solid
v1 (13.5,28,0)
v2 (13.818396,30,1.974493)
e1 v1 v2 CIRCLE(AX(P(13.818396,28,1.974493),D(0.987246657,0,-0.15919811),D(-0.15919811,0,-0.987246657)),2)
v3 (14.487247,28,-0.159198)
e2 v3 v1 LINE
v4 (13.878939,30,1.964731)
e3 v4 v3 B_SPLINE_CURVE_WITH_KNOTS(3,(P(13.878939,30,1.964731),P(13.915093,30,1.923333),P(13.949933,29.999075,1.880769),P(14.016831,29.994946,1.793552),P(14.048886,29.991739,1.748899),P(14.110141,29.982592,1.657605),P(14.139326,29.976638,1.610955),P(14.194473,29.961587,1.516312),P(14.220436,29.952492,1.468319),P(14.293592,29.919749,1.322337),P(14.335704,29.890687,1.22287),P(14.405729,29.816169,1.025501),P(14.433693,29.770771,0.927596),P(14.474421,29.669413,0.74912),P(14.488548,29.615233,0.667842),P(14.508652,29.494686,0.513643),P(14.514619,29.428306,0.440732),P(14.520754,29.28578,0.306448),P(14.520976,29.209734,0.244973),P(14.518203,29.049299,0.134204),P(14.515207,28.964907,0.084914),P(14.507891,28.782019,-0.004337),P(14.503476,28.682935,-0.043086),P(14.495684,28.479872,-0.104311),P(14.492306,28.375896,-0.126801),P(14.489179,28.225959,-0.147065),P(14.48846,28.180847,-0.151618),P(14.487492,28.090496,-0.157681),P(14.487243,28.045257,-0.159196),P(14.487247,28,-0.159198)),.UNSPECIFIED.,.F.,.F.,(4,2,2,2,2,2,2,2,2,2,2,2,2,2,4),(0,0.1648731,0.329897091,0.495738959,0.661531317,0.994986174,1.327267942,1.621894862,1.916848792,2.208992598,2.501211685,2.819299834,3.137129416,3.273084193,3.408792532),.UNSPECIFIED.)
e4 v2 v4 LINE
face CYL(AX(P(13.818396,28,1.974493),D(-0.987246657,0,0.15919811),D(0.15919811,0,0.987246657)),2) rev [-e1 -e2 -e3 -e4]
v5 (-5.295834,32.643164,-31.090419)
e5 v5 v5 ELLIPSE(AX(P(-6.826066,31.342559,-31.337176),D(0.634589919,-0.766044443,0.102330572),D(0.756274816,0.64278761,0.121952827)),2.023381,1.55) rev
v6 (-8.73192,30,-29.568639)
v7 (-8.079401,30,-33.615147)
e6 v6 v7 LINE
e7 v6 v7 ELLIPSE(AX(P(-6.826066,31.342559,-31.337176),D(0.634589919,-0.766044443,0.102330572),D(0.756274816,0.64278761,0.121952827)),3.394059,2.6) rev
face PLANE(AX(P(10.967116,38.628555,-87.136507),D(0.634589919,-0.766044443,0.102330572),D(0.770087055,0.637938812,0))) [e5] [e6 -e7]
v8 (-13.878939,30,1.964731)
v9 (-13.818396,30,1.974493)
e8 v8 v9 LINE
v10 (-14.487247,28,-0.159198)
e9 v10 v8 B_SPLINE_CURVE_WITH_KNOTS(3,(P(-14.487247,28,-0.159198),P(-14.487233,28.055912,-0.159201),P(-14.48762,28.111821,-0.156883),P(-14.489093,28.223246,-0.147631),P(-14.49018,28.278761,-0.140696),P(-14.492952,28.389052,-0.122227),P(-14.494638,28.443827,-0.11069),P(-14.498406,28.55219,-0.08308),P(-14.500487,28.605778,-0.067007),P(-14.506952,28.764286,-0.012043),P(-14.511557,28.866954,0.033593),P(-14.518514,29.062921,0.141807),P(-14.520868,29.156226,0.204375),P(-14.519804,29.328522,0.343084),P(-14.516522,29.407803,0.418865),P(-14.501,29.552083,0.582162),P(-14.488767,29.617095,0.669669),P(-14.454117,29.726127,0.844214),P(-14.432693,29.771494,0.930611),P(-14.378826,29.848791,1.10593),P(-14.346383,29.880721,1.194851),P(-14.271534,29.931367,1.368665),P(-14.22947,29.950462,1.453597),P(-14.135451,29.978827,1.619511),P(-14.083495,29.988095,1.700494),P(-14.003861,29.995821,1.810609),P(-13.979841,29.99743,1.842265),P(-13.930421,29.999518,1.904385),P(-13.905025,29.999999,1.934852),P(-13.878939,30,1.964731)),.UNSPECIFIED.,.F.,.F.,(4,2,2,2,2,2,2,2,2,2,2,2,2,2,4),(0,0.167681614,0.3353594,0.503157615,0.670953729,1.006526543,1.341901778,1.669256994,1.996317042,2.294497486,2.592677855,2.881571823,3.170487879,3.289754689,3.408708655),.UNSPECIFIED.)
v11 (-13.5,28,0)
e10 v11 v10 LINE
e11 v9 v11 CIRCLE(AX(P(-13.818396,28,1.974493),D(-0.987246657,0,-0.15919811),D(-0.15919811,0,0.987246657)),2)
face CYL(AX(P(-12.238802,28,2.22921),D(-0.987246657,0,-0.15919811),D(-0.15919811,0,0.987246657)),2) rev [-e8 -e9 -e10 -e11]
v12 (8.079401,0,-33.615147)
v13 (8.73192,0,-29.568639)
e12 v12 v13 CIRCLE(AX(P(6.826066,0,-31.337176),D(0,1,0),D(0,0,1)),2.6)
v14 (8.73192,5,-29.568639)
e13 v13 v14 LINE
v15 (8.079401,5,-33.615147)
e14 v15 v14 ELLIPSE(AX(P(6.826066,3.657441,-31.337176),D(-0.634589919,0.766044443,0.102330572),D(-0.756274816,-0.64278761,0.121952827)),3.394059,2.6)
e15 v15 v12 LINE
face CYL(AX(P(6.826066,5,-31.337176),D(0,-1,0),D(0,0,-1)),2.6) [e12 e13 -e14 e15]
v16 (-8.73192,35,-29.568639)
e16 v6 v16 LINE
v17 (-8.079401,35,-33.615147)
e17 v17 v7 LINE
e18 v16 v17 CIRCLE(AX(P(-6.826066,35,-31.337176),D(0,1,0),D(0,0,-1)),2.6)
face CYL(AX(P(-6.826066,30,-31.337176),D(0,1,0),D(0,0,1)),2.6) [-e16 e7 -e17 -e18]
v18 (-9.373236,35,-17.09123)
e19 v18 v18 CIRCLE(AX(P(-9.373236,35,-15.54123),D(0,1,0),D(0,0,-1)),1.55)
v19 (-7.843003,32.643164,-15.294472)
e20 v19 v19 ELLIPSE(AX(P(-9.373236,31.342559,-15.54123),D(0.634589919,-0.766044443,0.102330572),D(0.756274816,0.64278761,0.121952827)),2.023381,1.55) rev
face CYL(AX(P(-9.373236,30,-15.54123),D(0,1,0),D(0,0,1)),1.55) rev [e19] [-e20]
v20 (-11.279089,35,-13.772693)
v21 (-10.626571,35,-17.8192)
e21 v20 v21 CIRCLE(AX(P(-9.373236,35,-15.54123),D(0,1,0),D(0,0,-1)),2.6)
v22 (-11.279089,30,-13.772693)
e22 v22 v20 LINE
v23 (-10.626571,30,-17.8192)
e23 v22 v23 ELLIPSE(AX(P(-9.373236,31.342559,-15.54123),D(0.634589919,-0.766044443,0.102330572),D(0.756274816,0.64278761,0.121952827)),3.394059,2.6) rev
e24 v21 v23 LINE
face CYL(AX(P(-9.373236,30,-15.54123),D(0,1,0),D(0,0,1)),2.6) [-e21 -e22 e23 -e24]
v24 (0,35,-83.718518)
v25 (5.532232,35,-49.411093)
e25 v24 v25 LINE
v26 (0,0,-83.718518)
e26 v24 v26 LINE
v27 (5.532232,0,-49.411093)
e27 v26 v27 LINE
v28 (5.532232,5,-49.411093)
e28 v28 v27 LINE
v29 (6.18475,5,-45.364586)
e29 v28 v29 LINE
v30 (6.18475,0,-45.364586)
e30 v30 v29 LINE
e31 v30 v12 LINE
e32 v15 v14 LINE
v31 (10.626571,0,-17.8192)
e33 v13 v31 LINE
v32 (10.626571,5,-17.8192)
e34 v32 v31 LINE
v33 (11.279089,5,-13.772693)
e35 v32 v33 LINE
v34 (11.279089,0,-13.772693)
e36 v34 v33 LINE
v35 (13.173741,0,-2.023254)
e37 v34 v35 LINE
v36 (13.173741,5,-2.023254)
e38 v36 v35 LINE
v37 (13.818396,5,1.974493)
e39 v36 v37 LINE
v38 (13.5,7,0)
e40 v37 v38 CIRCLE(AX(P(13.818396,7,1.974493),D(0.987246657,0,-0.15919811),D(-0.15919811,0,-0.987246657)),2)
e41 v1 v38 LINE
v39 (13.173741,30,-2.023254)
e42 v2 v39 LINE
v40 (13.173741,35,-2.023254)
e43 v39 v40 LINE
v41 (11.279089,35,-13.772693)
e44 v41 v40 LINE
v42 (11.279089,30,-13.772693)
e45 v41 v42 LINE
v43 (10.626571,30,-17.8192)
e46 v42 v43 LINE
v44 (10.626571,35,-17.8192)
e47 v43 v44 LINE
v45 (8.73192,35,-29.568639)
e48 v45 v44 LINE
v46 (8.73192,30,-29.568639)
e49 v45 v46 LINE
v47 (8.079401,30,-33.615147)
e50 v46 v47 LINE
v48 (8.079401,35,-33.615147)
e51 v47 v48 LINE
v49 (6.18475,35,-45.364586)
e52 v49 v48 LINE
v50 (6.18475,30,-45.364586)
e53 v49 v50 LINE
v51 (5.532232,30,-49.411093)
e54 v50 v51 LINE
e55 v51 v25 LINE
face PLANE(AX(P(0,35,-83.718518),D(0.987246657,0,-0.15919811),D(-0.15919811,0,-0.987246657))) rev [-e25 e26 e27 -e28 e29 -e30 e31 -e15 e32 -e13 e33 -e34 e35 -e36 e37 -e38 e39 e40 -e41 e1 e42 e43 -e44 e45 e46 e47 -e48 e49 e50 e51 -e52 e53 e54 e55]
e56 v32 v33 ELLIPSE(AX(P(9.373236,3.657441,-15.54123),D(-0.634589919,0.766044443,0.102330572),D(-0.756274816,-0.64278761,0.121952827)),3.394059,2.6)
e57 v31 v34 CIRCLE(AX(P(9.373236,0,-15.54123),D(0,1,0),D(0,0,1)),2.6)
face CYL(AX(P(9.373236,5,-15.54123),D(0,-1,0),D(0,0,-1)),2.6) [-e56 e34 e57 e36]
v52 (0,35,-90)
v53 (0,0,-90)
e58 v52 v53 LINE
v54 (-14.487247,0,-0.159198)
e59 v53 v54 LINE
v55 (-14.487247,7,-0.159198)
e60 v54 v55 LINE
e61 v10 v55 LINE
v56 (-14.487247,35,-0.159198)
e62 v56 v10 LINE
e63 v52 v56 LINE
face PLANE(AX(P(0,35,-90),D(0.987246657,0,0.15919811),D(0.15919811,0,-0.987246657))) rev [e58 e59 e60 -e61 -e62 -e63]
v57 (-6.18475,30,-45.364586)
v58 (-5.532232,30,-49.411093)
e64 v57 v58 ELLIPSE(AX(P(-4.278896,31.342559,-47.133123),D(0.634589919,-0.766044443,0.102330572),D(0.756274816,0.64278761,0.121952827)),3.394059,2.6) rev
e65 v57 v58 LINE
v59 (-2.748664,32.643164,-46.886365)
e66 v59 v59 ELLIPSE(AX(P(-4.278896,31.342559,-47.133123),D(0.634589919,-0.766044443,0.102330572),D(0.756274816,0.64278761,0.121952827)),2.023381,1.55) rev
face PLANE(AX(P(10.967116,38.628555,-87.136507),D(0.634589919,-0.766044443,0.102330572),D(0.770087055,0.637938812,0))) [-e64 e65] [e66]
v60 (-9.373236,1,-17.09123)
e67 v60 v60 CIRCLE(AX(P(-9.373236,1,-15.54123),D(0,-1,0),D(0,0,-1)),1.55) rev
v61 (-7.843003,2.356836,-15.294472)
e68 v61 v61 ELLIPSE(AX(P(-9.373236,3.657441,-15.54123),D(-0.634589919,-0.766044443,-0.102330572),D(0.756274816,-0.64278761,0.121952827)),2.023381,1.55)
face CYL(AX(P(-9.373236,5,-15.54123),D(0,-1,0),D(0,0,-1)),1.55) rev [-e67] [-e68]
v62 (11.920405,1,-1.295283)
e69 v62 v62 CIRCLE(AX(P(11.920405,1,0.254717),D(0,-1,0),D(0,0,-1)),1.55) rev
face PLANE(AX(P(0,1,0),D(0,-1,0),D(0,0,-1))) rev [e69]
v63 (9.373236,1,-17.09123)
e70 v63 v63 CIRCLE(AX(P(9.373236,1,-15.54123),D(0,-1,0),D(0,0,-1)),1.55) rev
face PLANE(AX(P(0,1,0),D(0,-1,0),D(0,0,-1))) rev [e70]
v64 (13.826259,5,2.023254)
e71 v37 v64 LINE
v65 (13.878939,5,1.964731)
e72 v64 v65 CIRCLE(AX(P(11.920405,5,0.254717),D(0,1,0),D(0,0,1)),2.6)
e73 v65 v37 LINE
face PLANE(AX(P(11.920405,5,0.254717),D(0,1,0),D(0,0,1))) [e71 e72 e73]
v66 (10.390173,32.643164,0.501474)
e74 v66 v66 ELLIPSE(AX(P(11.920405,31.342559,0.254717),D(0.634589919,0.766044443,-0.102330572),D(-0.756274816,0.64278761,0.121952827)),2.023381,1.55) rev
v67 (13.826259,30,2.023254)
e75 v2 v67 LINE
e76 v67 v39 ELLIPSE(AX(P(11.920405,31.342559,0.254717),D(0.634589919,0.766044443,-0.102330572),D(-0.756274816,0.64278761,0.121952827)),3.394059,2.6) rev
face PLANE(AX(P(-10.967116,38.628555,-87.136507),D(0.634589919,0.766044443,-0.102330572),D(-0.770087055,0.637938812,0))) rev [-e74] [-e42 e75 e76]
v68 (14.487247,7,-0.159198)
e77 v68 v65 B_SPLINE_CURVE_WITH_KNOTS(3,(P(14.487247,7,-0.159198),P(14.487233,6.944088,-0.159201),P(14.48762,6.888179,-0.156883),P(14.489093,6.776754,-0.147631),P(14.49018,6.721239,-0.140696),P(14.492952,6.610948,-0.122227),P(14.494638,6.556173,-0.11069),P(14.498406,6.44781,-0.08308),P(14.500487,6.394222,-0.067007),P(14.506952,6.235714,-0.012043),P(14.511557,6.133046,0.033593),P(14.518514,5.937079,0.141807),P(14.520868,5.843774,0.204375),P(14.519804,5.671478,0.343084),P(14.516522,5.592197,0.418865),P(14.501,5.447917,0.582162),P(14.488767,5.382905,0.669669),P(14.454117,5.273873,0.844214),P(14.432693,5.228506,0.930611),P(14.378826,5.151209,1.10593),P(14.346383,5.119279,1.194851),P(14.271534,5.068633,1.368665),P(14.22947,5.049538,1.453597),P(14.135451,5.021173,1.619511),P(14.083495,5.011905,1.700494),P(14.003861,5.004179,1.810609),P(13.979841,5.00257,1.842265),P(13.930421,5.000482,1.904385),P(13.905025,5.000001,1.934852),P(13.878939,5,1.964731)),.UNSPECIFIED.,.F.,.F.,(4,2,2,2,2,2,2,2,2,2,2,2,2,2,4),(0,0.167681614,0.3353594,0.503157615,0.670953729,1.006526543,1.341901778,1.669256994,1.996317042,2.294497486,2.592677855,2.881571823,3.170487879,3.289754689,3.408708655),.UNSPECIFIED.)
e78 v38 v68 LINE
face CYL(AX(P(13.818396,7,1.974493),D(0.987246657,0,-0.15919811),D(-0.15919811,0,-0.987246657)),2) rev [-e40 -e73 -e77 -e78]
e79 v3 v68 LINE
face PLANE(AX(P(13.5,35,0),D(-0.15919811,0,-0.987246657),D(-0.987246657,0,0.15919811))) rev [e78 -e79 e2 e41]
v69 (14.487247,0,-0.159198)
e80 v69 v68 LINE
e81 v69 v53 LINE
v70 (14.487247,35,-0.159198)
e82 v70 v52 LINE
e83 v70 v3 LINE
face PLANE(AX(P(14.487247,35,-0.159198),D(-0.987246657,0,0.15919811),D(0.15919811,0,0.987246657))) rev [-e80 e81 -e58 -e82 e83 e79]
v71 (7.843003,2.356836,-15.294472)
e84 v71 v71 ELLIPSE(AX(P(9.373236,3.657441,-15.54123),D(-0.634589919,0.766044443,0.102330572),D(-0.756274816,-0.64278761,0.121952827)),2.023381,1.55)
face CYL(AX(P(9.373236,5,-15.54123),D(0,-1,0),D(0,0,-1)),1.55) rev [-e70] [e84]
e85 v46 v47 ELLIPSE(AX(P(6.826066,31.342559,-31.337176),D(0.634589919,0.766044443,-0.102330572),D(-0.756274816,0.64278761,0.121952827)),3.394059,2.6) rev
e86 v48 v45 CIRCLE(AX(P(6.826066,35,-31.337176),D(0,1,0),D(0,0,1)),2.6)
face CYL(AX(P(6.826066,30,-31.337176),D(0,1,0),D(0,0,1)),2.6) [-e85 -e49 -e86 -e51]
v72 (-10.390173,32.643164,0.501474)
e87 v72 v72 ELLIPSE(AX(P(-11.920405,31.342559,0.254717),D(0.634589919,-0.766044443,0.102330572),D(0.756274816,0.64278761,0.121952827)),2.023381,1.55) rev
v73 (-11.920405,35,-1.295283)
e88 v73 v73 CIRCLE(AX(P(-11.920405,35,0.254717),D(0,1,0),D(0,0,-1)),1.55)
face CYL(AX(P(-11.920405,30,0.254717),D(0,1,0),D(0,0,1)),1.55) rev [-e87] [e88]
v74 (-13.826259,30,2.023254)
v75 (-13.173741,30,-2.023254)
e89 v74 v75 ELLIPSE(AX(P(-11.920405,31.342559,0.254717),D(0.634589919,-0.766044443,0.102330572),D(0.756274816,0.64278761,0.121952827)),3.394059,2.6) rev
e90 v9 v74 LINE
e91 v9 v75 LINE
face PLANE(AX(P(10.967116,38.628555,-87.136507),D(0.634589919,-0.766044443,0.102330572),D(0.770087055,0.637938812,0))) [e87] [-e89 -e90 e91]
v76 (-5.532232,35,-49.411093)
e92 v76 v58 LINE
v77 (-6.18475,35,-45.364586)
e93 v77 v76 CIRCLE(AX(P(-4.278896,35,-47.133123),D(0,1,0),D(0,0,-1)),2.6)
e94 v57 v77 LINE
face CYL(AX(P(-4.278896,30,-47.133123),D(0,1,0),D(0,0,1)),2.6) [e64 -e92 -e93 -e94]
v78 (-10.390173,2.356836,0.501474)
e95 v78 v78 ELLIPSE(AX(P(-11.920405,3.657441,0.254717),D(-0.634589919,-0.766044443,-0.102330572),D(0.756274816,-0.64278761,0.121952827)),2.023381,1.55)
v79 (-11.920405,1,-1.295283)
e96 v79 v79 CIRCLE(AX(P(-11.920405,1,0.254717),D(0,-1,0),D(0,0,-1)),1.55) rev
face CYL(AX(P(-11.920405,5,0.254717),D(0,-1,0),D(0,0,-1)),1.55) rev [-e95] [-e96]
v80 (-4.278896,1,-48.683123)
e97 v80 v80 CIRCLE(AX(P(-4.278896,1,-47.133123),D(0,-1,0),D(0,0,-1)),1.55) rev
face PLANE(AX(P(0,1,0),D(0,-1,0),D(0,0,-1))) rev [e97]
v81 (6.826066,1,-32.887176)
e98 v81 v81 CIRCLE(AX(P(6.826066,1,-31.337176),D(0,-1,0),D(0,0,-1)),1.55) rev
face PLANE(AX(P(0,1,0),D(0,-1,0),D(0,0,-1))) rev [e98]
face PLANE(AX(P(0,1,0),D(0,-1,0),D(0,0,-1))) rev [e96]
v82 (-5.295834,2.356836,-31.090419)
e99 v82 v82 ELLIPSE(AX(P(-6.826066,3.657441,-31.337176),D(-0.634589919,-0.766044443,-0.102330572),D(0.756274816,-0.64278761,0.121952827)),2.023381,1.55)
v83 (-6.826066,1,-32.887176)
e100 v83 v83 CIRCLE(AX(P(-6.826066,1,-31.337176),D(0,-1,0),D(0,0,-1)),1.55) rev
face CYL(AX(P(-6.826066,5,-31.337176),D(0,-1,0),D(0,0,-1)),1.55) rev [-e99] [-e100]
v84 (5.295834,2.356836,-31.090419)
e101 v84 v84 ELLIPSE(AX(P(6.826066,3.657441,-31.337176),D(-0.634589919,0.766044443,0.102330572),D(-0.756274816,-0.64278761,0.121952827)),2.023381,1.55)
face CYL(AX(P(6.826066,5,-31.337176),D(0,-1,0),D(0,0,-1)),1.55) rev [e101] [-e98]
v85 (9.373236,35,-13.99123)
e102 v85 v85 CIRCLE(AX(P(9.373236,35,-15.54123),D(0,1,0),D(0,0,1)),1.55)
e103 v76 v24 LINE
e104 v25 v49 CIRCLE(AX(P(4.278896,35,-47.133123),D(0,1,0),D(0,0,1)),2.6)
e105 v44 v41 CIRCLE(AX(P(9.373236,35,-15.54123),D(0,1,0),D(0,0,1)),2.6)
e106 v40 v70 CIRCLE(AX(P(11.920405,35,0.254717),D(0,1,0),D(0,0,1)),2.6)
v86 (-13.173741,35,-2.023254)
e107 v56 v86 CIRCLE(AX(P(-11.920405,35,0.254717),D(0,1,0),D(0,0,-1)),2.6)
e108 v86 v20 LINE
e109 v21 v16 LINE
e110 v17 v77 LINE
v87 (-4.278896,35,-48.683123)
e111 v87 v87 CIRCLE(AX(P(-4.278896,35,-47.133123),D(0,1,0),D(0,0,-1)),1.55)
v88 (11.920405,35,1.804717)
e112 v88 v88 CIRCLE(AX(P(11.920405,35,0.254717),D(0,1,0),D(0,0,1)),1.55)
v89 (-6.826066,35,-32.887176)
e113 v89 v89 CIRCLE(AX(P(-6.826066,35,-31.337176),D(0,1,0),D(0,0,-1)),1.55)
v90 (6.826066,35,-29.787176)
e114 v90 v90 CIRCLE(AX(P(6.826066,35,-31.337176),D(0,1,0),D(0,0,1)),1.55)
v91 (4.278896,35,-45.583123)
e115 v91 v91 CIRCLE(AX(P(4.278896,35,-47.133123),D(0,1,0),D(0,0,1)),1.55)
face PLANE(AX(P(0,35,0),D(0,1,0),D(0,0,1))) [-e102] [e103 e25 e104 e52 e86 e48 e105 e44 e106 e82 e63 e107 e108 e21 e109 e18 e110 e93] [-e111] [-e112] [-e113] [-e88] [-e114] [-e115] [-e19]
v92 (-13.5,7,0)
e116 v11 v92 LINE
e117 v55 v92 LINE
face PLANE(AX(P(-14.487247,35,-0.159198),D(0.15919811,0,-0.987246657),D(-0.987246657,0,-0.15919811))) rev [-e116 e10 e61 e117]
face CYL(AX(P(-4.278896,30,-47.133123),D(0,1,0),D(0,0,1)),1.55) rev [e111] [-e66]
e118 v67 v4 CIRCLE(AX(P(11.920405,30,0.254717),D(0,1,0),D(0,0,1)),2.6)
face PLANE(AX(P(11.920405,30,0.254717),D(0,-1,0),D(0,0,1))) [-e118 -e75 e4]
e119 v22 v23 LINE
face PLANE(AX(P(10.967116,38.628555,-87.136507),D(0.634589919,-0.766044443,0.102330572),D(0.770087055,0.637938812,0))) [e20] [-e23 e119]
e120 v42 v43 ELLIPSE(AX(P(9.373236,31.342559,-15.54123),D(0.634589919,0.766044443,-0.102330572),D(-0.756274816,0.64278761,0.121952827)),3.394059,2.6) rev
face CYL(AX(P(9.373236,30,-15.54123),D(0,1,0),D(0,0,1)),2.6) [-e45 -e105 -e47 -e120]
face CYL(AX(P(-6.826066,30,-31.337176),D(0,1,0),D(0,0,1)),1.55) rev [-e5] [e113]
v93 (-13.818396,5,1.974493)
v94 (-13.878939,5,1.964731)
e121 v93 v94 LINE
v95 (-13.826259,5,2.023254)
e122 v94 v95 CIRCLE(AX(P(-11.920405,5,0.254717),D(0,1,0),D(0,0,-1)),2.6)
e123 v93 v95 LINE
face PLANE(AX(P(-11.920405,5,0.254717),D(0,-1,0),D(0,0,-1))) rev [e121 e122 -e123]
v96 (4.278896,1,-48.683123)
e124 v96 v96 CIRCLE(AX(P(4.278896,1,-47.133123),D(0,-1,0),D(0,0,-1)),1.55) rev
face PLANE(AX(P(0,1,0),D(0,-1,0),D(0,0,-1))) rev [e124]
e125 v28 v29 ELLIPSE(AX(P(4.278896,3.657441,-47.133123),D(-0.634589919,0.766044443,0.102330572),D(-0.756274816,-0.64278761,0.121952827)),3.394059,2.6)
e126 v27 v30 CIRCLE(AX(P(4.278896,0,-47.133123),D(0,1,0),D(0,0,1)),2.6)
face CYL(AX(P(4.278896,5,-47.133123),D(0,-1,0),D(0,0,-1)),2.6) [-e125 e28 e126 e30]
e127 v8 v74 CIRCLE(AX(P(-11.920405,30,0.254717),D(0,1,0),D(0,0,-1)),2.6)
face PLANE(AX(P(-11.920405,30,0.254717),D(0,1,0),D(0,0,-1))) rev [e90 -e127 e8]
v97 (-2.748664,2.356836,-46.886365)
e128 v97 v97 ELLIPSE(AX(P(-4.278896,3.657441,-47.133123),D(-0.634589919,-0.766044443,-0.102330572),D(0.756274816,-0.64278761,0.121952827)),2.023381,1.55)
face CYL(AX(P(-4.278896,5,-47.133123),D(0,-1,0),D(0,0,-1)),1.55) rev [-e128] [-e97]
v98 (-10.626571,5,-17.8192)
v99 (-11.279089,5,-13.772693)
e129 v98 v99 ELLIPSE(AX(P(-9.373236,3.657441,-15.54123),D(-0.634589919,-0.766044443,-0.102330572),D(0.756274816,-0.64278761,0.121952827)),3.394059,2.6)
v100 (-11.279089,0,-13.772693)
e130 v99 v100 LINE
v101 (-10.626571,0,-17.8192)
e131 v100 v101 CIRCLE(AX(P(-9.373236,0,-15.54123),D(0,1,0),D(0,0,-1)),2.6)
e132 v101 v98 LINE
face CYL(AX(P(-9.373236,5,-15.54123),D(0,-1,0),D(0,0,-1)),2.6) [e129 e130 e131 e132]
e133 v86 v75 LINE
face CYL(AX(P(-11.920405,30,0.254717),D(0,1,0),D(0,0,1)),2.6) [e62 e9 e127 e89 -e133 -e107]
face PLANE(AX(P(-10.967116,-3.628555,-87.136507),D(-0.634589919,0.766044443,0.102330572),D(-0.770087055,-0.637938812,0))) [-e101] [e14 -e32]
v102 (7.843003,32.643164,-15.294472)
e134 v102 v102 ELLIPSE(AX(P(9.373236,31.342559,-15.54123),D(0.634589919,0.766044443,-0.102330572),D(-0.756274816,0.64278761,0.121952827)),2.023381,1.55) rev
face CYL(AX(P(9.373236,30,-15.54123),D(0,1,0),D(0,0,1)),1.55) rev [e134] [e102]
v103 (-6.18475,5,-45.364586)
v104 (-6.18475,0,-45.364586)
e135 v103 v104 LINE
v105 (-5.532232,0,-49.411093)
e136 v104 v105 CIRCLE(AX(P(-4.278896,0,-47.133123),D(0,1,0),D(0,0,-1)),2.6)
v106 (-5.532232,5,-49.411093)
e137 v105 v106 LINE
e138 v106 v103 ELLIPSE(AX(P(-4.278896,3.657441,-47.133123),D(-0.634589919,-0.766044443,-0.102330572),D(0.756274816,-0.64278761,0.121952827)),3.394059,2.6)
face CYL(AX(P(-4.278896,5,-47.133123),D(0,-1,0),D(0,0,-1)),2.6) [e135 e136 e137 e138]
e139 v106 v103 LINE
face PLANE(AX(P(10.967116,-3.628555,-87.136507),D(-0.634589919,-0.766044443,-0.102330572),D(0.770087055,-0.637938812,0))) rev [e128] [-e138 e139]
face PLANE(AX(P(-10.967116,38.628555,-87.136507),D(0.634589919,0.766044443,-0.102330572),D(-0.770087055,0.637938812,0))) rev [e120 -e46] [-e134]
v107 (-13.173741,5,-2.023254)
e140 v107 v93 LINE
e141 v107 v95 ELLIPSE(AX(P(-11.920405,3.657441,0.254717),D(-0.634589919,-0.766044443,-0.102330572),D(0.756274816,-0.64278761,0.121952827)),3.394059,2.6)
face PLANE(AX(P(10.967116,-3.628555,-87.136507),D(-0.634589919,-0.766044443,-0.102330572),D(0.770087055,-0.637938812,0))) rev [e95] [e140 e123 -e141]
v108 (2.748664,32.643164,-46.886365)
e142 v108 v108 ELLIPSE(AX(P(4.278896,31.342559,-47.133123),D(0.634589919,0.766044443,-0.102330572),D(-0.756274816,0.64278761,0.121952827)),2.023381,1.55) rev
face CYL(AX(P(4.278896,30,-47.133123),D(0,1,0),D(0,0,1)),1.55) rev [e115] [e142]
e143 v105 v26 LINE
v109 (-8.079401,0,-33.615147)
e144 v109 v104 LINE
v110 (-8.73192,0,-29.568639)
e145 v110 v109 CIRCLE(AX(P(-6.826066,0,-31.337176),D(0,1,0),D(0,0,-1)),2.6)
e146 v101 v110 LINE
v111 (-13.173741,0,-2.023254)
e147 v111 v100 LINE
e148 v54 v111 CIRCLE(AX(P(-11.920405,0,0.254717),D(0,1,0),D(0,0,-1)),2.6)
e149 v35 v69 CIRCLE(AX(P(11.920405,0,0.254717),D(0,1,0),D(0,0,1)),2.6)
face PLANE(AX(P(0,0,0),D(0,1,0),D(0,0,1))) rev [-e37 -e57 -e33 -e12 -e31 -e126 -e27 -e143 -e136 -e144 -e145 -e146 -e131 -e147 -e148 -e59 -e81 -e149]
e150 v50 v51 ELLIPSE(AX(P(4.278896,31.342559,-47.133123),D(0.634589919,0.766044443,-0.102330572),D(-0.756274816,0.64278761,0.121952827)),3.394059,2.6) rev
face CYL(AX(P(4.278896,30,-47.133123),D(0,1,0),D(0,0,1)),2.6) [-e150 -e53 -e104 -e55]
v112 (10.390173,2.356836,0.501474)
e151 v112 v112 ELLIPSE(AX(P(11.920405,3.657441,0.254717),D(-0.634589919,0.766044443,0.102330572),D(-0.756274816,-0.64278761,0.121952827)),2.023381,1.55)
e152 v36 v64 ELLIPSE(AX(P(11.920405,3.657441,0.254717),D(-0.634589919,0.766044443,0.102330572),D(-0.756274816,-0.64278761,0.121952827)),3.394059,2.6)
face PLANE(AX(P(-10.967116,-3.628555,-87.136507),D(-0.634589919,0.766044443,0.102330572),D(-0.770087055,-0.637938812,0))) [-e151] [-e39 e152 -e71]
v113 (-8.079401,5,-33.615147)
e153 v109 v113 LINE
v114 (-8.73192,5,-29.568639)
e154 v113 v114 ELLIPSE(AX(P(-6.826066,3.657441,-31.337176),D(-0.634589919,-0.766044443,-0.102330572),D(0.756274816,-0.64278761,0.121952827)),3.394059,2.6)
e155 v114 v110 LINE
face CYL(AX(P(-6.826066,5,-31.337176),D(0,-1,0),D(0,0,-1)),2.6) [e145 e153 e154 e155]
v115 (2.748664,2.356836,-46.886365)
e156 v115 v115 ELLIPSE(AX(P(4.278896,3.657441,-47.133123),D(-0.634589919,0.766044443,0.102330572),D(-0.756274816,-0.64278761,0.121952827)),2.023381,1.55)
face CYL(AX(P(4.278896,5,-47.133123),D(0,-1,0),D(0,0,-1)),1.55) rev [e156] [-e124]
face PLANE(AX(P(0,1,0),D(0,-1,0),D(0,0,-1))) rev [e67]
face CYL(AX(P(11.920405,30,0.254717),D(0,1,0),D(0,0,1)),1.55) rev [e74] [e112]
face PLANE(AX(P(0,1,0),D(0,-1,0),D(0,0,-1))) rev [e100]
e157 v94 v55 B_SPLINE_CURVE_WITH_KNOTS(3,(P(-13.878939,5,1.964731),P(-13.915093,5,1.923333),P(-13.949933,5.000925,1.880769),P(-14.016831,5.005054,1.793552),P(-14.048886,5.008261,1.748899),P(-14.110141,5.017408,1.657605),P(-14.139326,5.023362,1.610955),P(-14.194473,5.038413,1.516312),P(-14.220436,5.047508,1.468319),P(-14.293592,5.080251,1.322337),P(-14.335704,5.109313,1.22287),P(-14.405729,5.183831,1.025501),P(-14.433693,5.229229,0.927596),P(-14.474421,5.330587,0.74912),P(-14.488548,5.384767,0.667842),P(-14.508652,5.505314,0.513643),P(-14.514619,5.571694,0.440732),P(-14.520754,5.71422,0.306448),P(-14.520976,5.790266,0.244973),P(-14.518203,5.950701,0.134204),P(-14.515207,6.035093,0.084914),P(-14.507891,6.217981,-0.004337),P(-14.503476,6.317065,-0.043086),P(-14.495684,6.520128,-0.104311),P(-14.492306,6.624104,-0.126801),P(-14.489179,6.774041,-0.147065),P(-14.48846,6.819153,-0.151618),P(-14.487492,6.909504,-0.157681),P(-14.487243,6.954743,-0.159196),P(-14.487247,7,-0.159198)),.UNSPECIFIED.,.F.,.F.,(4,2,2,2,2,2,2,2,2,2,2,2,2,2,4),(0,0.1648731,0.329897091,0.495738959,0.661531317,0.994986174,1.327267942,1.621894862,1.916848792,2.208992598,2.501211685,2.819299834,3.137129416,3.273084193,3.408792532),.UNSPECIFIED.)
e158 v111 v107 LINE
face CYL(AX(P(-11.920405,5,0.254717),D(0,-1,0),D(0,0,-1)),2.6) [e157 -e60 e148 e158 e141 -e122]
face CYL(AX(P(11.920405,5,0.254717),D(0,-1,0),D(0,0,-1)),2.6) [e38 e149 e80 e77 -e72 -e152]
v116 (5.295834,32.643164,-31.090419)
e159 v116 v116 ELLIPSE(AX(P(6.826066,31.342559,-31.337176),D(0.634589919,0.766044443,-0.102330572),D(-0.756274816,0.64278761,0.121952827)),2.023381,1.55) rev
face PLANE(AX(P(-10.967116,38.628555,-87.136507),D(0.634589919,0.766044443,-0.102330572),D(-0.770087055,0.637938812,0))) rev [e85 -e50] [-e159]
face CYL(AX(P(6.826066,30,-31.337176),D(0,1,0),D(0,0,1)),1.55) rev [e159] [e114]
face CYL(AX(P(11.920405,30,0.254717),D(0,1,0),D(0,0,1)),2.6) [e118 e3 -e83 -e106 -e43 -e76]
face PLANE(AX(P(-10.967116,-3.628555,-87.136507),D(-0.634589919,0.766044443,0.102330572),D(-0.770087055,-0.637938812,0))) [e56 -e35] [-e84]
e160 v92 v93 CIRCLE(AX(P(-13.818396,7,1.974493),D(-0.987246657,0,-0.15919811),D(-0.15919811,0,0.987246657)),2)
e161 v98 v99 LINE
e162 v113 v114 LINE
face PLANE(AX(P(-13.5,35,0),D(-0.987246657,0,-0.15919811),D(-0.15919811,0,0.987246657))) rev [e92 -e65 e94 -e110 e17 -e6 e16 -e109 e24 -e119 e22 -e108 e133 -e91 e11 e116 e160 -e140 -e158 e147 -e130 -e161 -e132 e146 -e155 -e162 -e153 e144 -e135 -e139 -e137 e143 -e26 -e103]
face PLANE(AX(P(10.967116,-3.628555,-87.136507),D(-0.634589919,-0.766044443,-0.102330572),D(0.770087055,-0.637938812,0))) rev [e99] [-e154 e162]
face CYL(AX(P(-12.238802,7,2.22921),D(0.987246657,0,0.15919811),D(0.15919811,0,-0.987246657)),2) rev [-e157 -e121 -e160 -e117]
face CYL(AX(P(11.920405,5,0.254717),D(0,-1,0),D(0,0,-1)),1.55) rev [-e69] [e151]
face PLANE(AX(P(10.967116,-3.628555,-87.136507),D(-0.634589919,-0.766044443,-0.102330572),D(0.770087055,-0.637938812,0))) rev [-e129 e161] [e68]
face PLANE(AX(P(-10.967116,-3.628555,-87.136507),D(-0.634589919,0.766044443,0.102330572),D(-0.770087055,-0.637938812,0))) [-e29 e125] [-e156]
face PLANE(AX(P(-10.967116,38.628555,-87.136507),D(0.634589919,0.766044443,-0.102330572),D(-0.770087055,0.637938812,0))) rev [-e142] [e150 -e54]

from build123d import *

# Parameters (mm, degrees)
BOSS_EXTRUDE1_DEPTH            = 35
SKETCH2_R                      = 2.6
SKETCH2_R_2                    = 1.55
BOSS_EXTRUDE3_DEPTH            = 5
CUT_EXTRUDE1_REACH             = 101.661
CUT_EXTRUDE1_DIRECTION_2_DEPTH = 100.661000569
CUT_EXTRUDE2_REACH             = 101.661
CUT_EXTRUDE2_DIRECTION_2_DEPTH = 100.661000569
FILLET1_R                      = 2
SKETCH6_R                      = 2.6
BOSS_EXTRUDE4_DEPTH            = 1


with BuildPart() as part:
    # Sketch1 → Boss-Extrude1 (new body)
    with BuildSketch(Plane(origin=(0, 0, 0), x_dir=(1, 0, 0), z_dir=(0, 1, 0))):
        Polygon((-13.5, 0), (0, 83.718518379), (13.5, 0), (14.487246657, 0.15919811), (0, 90), (-14.487246657, 0.15919811), align=None)
    extrude(amount=BOSS_EXTRUDE1_DEPTH)

    # Sketch2 → Boss-Extrude3 (add)
    # profile 1 of 8: a face of its own
    with BuildSketch(Plane(origin=(0, 0, 0), x_dir=(1, 0, 0), z_dir=(0, 1, 0))):
        with Locations((11.920405349, -0.254716975)):
            Circle(SKETCH2_R)
        with Locations(Location((11.920405349, -0.254716975, 0), (0, 0, 270))):
            Circle(SKETCH2_R_2, mode=Mode.SUBTRACT)
    # profile 2 of 8: a face of its own
    with BuildSketch(Plane(origin=(0, 0, 0), x_dir=(1, 0, 0), z_dir=(0, 1, 0))):
        with Locations((9.373235594, 15.541229537)):
            Circle(SKETCH2_R)
        with Locations(Location((9.373235594, 15.541229537, 0), (0, 0, 270))):
            Circle(SKETCH2_R_2, mode=Mode.SUBTRACT)
    # profile 3 of 8: a face of its own
    with BuildSketch(Plane(origin=(0, 0, 0), x_dir=(1, 0, 0), z_dir=(0, 1, 0))):
        with Locations((6.826065839, 31.33717605)):
            Circle(SKETCH2_R)
        with Locations(Location((6.826065839, 31.33717605, 0), (0, 0, 270))):
            Circle(SKETCH2_R_2, mode=Mode.SUBTRACT)
    # profile 4 of 8: a face of its own
    with BuildSketch(Plane(origin=(0, 0, 0), x_dir=(1, 0, 0), z_dir=(0, 1, 0))):
        with Locations((4.278896085, 47.133122563)):
            Circle(SKETCH2_R)
        with Locations(Location((4.278896085, 47.133122563, 0), (0, 0, 270))):
            Circle(SKETCH2_R_2, mode=Mode.SUBTRACT)
    # profile 5 of 8: a face of its own
    with BuildSketch(Plane(origin=(0, 0, 0), x_dir=(1, 0, 0), z_dir=(0, 1, 0))):
        with Locations((-4.278896085, 47.133122563)):
            Circle(SKETCH2_R)
        with Locations(Location((-4.278896085, 47.133122563, 0), (0, 0, 90))):
            Circle(SKETCH2_R_2, mode=Mode.SUBTRACT)
    # profile 6 of 8: a face of its own
    with BuildSketch(Plane(origin=(0, 0, 0), x_dir=(1, 0, 0), z_dir=(0, 1, 0))):
        with Locations((-6.826065839, 31.33717605)):
            Circle(SKETCH2_R)
        with Locations(Location((-6.826065839, 31.33717605, 0), (0, 0, 90))):
            Circle(SKETCH2_R_2, mode=Mode.SUBTRACT)
    # profile 7 of 8: a face of its own
    with BuildSketch(Plane(origin=(0, 0, 0), x_dir=(1, 0, 0), z_dir=(0, 1, 0))):
        with Locations((-9.373235594, 15.541229537)):
            Circle(SKETCH2_R)
        with Locations(Location((-9.373235594, 15.541229537, 0), (0, 0, 90))):
            Circle(SKETCH2_R_2, mode=Mode.SUBTRACT)
    # profile 8 of 8: a face of its own
    with BuildSketch(Plane(origin=(0, 0, 0), x_dir=(1, 0, 0), z_dir=(0, 1, 0))):
        with Locations((-11.920405349, -0.254716975)):
            Circle(SKETCH2_R)
        with Locations(Location((-11.920405349, -0.254716975, 0), (0, 0, 90))):
            Circle(SKETCH2_R_2, mode=Mode.SUBTRACT)
    boss_extrude3 = extrude(amount=BOSS_EXTRUDE3_DEPTH)

    # Cut-Extrude1: up to this face of the body (flat: up to its plane)
    cut_extrude1_end = Plane(part.part.faces().sort_by_distance((-6.691549619, 17.871487916, -42.221731728))[0])
    # Sketch4 → Cut-Extrude1 (cut, up to the picked face)
    with BuildSketch(Plane(origin=(0.342144515, 0, 2.121765321), x_dir=(0.9872466570606503, 0, -0.1591981096702188), z_dir=(0.1591981096702188, 0, 0.9872466570606503)), mode=Mode.PRIVATE) as cut_extrude1_sk1:
        Polygon((13.32782987, 5), (9.12782987, 5), (9.12782987, 1.475781549), align=None)
    cut_extrude1_tool1 = split(extrude(cut_extrude1_sk1.sketch, amount=-CUT_EXTRUDE1_REACH, mode=Mode.PRIVATE), bisect_by=cut_extrude1_end, keep=Keep.BOTH, mode=Mode.PRIVATE)
    cut_extrude1 = cut_extrude1_tool1.solids().sort_by(Axis((10.735709, 3.825261, 0.445755), (-0.1591981096702188, 0, -0.9872466570606503)))[0]
    add(cut_extrude1, mode=Mode.SUBTRACT)

    # Sketch4 → Cut-Extrude1 direction 2 (cut)
    with BuildSketch(Plane(origin=(0.342144515, 0, 2.121765321), x_dir=(0.9872466570606503, 0, -0.1591981096702188), z_dir=(0.1591981096702188, 0, 0.9872466570606503))):
        Polygon((13.32782987, 5), (9.12782987, 5), (9.12782987, 1.475781549), align=None)
    cut_extrude1_direction_2 = extrude(amount=CUT_EXTRUDE1_DIRECTION_2_DEPTH, mode=Mode.SUBTRACT)

    # Cut-Extrude2: up to this face of the body (flat: up to its plane)
    cut_extrude2_end = Plane(part.part.faces().sort_by_distance((6.691549619, 17.871487916, -42.221731728))[0])
    # Sketch5 → Cut-Extrude2 (cut, up to the picked face)
    with BuildSketch(Plane(origin=(-0.342144515, 0, 2.121765321), x_dir=(0.9872466570606502, 0, 0.15919810967021986), z_dir=(-0.15919810967021986, 0, 0.9872466570606502)), mode=Mode.PRIVATE) as cut_extrude2_sk1:
        Polygon((-9.12782987, 5), (-9.12782987, 1.475781549), (-13.32782987, 5), align=None)
    cut_extrude2_tool1 = split(extrude(cut_extrude2_sk1.sketch, amount=-CUT_EXTRUDE2_REACH, mode=Mode.PRIVATE), bisect_by=cut_extrude2_end, keep=Keep.BOTH, mode=Mode.PRIVATE)
    cut_extrude2 = cut_extrude2_tool1.solids().sort_by(Axis((-10.735709, 3.825261, 0.445755), (0.15919810967021986, 0, -0.9872466570606502)))[0]
    add(cut_extrude2, mode=Mode.SUBTRACT)

    # Sketch5 → Cut-Extrude2 direction 2 (cut)
    with BuildSketch(Plane(origin=(-0.342144515, 0, 2.121765321), x_dir=(0.9872466570606502, 0, 0.15919810967021986), z_dir=(-0.15919810967021986, 0, 0.9872466570606502))):
        Polygon((-9.12782987, 5), (-9.12782987, 1.475781549), (-13.32782987, 5), align=None)
    cut_extrude2_direction_2 = extrude(amount=CUT_EXTRUDE2_DIRECTION_2_DEPTH, mode=Mode.SUBTRACT)

    # Mirror2: Boss-Extrude3, Cut-Extrude1, Cut-Extrude1 direction 2, Cut-Extrude2, Cut-Extrude2 direction 2 across plane
    add(boss_extrude3.mirror(Plane.ZX.offset(17.5)))
    add(cut_extrude1.mirror(Plane.ZX.offset(17.5)), mode=Mode.SUBTRACT)
    add(cut_extrude1_direction_2.mirror(Plane.ZX.offset(17.5)), mode=Mode.SUBTRACT)
    add(cut_extrude2.mirror(Plane.ZX.offset(17.5)), mode=Mode.SUBTRACT)
    add(cut_extrude2_direction_2.mirror(Plane.ZX.offset(17.5)), mode=Mode.SUBTRACT)

    # Fillet1
    # the kernel refuses this fillet: 2 mm, written as the material it adds along each edge
    with BuildSketch(Plane(origin=(-19.423479942, 5, -0.955188658), x_dir=(-0.15919810967021975, 0, 0.9872466570606501), z_dir=(0.9872466570606501, 0, 0.15919810967021975))) as fillet1_piece_1_section:
        with BuildLine():
            CenterArc((FILLET1_R, -FILLET1_R), FILLET1_R, 90, 90)
            Line((0, -FILLET1_R), (0, 0))
            Line((0, 0), (FILLET1_R, 0))
        make_face()
    fillet1_piece_1 = extrude(amount=6, mode=Mode.PRIVATE)
    fillet1_piece_1 = fillet1_piece_1 & Plane(origin=(-11.920405349, 5.222362792, 0.254716975), x_dir=(1, 0, 0), z_dir=(0, -1, 0)) * Cylinder(2.6, 21, mode=Mode.PRIVATE)
    add(fillet1_piece_1)
    with BuildSketch(Plane(origin=(13.5, 5, 0), x_dir=(0, 1, 0), z_dir=(0.9872466570606502, 0, -0.15919810967021866))) as fillet1_piece_2_section:
        with BuildLine():
            CenterArc((FILLET1_R, FILLET1_R), FILLET1_R, 180, 90)
            Line((0, FILLET1_R), (0, 0))
            Line((0, 0), (FILLET1_R, 0))
        make_face()
    fillet1_piece_2 = extrude(amount=6, mode=Mode.PRIVATE)
    fillet1_piece_2 = fillet1_piece_2 & Plane(origin=(11.920405349, 5.699977741, 0.254716975), x_dir=(1, 0, 0), z_dir=(0, -1, 0)) * Cylinder(2.6, 20, mode=Mode.PRIVATE)
    add(fillet1_piece_2)
    with BuildSketch(Plane(origin=(13.5, 30, 0), x_dir=(0, -1, 0), z_dir=(0.9872466570606502, 0, -0.15919810967021866))) as fillet1_piece_3_section:
        with BuildLine():
            CenterArc((FILLET1_R, -FILLET1_R), FILLET1_R, 90, 90)
            Line((0, -FILLET1_R), (0, 0))
            Line((0, 0), (FILLET1_R, 0))
        make_face()
    fillet1_piece_3 = extrude(amount=6, mode=Mode.PRIVATE)
    fillet1_piece_3 = fillet1_piece_3 & Plane(origin=(11.920405349, 29.300022259, 0.254716975), x_dir=(1, 0, 0), z_dir=(0, 1, 0)) * Cylinder(2.6, 20, mode=Mode.PRIVATE)
    add(fillet1_piece_3)
    with BuildSketch(Plane(origin=(-19.423479942, 30, -0.955188658), x_dir=(0, -1, 0), z_dir=(0.9872466570606501, 0, 0.15919810967021975))) as fillet1_piece_4_section:
        with BuildLine():
            CenterArc((FILLET1_R, -FILLET1_R), FILLET1_R, 90, 90)
            Line((0, -FILLET1_R), (0, 0))
            Line((0, 0), (FILLET1_R, 0))
        make_face()
    fillet1_piece_4 = extrude(amount=6, mode=Mode.PRIVATE)
    fillet1_piece_4 = fillet1_piece_4 & Plane(origin=(-11.920405349, 29.777637105, 0.254716975), x_dir=(1, 0, 0), z_dir=(0, 1, 0)) * Cylinder(2.6, 21, mode=Mode.PRIVATE)
    add(fillet1_piece_4)

    # Sketch6 → Boss-Extrude4 (add)
    with BuildSketch(Plane.XZ):
        with Locations((11.920405349, 0.254716975)):
            Circle(SKETCH6_R)
        with Locations((9.373235594, -15.541229537)):
            Circle(SKETCH6_R)
        with Locations((6.826065839, -31.33717605)):
            Circle(SKETCH6_R)
        with Locations((4.278896085, -47.133122563)):
            Circle(SKETCH6_R)
        with Locations((-4.278896085, -47.133122563)):
            Circle(SKETCH6_R)
        with Locations((-6.826065839, -31.33717605)):
            Circle(SKETCH6_R)
        with Locations((-9.373235594, -15.541229537)):
            Circle(SKETCH6_R)
        with Locations((-11.920405349, 0.254716975)):
            Circle(SKETCH6_R)
    extrude(amount=-BOSS_EXTRUDE4_DEPTH)


solid = part.part
